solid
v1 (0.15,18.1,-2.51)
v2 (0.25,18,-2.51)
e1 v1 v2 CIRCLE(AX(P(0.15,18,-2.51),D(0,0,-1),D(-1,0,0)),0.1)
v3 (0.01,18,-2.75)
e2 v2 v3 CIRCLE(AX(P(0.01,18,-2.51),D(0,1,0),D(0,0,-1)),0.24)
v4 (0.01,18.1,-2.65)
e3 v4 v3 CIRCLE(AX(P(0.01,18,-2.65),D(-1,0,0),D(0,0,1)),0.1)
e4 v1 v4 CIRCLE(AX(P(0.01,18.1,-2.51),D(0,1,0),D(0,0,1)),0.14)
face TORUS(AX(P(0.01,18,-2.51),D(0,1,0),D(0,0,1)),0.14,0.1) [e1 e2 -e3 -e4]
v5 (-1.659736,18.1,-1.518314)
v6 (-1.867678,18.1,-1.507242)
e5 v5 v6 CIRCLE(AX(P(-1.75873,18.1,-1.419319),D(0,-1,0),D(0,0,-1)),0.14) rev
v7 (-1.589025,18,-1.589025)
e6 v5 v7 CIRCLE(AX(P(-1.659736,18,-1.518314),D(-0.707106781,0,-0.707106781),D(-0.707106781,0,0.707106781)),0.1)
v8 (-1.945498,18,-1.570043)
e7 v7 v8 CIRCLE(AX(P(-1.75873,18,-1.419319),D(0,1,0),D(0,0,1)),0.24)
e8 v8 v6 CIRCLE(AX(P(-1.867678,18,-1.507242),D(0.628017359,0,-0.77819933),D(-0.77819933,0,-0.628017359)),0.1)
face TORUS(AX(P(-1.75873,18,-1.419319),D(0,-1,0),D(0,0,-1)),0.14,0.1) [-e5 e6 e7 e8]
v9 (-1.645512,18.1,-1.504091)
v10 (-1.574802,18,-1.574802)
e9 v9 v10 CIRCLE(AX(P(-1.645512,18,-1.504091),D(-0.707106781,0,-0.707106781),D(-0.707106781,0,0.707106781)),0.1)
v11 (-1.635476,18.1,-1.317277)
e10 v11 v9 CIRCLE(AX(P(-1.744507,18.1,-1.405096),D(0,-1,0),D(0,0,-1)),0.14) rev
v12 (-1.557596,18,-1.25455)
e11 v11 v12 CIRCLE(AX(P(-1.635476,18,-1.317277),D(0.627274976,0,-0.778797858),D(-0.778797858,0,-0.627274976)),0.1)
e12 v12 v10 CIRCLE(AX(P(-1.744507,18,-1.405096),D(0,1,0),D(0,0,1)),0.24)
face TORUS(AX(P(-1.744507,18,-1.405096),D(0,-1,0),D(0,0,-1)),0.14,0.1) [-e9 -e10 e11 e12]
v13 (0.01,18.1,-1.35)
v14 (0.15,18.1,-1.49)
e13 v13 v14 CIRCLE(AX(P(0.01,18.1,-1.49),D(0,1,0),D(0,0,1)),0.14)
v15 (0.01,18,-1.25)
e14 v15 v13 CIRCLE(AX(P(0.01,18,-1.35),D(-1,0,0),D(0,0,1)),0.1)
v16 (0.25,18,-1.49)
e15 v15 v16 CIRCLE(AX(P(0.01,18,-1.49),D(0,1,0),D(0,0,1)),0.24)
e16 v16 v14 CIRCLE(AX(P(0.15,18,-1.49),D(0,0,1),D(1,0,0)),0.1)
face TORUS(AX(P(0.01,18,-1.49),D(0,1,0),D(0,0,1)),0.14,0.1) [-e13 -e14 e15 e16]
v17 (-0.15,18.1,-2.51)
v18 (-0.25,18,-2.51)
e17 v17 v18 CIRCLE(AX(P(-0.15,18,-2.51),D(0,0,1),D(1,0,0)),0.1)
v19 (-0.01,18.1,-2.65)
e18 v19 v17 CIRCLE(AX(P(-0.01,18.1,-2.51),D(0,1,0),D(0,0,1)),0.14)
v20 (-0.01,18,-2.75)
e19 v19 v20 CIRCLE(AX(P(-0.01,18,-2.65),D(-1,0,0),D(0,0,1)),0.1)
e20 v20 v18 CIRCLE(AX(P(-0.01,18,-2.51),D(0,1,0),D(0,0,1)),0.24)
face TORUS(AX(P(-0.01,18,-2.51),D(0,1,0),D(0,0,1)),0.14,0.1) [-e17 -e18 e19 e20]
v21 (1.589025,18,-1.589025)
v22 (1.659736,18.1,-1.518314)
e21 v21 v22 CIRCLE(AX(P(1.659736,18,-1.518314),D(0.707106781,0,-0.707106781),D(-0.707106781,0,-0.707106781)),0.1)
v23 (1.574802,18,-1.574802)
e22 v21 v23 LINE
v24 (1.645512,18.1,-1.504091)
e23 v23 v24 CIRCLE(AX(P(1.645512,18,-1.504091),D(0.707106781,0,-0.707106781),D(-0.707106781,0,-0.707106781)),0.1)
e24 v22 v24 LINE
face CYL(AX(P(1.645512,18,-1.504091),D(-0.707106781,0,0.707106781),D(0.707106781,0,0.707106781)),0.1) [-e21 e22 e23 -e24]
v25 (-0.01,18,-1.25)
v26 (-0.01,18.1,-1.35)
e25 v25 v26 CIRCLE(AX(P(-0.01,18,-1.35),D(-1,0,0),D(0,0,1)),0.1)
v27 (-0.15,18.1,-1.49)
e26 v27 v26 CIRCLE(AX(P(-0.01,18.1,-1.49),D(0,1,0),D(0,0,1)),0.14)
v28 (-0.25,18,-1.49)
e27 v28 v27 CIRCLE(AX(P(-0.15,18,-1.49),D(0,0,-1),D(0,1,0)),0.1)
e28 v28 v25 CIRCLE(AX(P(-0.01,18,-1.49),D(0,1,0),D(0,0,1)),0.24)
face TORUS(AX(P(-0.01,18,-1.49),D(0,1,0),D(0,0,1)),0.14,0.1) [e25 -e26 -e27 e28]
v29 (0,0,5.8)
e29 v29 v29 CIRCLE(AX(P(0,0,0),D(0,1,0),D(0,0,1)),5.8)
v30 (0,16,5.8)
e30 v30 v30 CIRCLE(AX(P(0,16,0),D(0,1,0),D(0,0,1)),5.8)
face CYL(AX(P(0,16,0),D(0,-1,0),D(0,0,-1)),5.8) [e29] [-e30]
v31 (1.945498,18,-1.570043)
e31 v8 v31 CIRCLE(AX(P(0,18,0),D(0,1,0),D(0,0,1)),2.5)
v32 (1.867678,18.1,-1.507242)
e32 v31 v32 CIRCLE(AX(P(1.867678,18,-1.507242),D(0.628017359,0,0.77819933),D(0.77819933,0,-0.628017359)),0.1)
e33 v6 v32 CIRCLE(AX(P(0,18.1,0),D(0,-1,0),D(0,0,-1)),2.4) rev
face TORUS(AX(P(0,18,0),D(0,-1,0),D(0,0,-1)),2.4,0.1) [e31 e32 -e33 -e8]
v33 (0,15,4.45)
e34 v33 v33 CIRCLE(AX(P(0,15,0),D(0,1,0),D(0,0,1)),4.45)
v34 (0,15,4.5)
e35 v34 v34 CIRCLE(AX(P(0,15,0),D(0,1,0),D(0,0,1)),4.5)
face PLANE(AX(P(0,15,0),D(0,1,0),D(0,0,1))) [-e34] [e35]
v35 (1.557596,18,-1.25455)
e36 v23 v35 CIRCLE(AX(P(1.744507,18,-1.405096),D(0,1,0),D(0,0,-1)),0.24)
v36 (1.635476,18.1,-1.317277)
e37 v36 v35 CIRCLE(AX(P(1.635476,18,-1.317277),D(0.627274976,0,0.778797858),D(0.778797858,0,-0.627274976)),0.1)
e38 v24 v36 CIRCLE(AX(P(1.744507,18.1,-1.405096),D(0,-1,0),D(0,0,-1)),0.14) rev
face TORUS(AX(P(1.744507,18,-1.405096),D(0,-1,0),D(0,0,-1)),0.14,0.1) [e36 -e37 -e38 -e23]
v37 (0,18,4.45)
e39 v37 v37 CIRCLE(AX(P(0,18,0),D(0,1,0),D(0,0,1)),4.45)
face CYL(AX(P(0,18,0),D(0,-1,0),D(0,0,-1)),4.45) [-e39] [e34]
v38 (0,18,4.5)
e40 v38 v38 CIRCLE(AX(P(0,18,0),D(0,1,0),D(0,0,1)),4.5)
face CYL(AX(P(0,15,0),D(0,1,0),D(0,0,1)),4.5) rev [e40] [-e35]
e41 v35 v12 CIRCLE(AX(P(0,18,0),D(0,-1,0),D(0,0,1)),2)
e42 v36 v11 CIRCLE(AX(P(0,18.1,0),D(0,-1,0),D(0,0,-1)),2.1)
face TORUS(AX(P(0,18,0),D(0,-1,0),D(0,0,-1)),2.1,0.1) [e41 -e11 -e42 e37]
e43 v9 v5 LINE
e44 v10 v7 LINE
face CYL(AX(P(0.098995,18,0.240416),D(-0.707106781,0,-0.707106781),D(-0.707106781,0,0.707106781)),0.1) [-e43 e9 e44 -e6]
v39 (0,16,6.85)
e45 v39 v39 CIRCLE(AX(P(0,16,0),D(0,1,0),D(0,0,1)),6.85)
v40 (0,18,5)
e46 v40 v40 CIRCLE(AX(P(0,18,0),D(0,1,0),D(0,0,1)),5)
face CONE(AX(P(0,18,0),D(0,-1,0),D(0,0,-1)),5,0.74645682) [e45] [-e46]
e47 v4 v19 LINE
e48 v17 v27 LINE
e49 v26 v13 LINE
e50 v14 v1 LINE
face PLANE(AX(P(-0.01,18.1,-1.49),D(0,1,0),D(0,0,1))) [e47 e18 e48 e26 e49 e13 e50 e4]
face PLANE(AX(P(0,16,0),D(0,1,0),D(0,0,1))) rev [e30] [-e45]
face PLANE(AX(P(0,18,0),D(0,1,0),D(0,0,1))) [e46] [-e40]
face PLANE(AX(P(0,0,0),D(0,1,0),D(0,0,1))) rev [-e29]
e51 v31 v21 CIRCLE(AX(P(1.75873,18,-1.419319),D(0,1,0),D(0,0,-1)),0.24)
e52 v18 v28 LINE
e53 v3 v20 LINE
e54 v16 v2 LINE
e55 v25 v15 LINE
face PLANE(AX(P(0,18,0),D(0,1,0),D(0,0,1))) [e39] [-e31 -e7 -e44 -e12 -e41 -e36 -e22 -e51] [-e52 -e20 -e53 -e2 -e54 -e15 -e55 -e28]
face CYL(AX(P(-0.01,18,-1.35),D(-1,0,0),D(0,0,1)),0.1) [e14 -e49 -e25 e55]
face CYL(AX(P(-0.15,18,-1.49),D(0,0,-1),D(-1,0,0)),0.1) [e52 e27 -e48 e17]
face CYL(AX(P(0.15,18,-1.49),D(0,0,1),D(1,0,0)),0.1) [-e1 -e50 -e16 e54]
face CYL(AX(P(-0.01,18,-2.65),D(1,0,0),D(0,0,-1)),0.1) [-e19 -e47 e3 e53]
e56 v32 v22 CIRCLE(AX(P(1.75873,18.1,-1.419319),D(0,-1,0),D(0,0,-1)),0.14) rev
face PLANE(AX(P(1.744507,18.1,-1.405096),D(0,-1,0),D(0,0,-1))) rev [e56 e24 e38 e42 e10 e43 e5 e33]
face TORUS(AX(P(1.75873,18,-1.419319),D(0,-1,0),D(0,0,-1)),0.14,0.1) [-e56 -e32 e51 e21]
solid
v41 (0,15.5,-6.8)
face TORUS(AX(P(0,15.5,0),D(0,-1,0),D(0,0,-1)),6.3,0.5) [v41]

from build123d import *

# Parameters (mm, degrees)
SKETCH1_R           = 5.8
BOSS_EXTRUDE1_DEPTH = 16
SKETCH3_R           = 5
SKETCH2_R           = 6.85
SKETCH4_R           = 4.5
CUT_EXTRUDE1_DEPTH  = 3
SKETCH6_R           = 4.45
BOSS_EXTRUDE2_DEPTH = 3
BOSS_EXTRUDE3_DEPTH = 0.1
FILLET1_R           = 0.1
SKETCH8_R           = 0.5


with BuildPart() as part:
    # Sketch1 → Boss-Extrude1 (new body)
    with BuildSketch(Plane(origin=(0, 0, 0), x_dir=(1, 0, 0), z_dir=(0, 1, 0))):
        with Locations(Location((0, 0, 0), (0, 0, 270))):
            Circle(SKETCH1_R)
    extrude(amount=BOSS_EXTRUDE1_DEPTH)

    # Sketch3 → Loft1 section 0
    with BuildSketch(Plane(origin=(0, 18, 0), x_dir=(1, 0, 0), z_dir=(0, 1, 0))):
        Circle(SKETCH3_R)
    # Sketch2 → Loft1 section 1
    with BuildSketch(Plane(origin=(0, 16, 0), x_dir=(1, 0, 0), z_dir=(0, 1, 0))):
        Circle(SKETCH2_R)
    loft()

    # Sketch4 → Cut-Extrude1 (cut)
    with BuildSketch(Plane(origin=(0, 18, 0), x_dir=(1, 0, 0), z_dir=(0, 1, 0))):
        with Locations(Location((0, 0, 0), (0, 0, 270))):
            Circle(SKETCH4_R)
    extrude(amount=-CUT_EXTRUDE1_DEPTH, mode=Mode.SUBTRACT)

    # Sketch6 → Boss-Extrude2 (add)
    with BuildSketch(Plane(origin=(0, 15, 0), x_dir=(1, 0, 0), z_dir=(0, 1, 0))):
        with Locations(Location((0, 0, 0), (0, 0, 270))):
            Circle(SKETCH6_R)
    extrude(amount=BOSS_EXTRUDE2_DEPTH)

    # Sketch7 → Boss-Extrude3 (add)
    with BuildSketch(Plane(origin=(0, 18, 0), x_dir=(1, 0, 0), z_dir=(0, 1, 0))):
        with BuildLine():
            Line((-1.589024858, 1.589024858), (-1.574801575, 1.574801575))
            ThreePointArc((-1.574801575, 1.574801575), (-1.504852833, 1.417971633), (-1.557595716, 1.254549953))
            ThreePointArc((-1.557595716, 1.254549953), (0, -2), (1.557595716, 1.254549953))
            ThreePointArc((1.557595716, 1.254549953), (1.504852833, 1.417971633), (1.574801575, 1.574801575))
            Line((1.574801575, 1.574801575), (1.589024858, 1.589024858))
            ThreePointArc((1.589024858, 1.589024858), (1.771491902, 1.658979712), (1.945498325, 1.570043397))
            ThreePointArc((1.945498325, 1.570043397), (0, -2.5), (-1.945498325, 1.570043397))
            ThreePointArc((-1.945498325, 1.570043397), (-1.771491902, 1.658979712), (-1.589024858, 1.589024858))
        make_face()
        with BuildLine():
            Line((-0.01, 2.75), (0.01, 2.75))
            ThreePointArc((0.01, 2.75), (0.179705627, 2.679705627), (0.25, 2.51))
            Line((0.25, 2.51), (0.25, 1.49))
            ThreePointArc((0.25, 1.49), (0.179705627, 1.320294373), (0.01, 1.25))
            Line((0.01, 1.25), (-0.01, 1.25))
            ThreePointArc((-0.01, 1.25), (-0.179705627, 1.320294373), (-0.25, 1.49))
            Line((-0.25, 1.49), (-0.25, 2.51))
            ThreePointArc((-0.25, 2.51), (-0.179705627, 2.679705627), (-0.01, 2.75))
        make_face()
    extrude(amount=BOSS_EXTRUDE3_DEPTH)

    # Fillet1
    fillet1_edges = [part.edges().sort_by_distance(p)[0] for p in [
        (-1.771491902, 18.1, -1.658979712),
        (-1.581913217, 18.1, -1.581913217),
        (-1.504852833, 18.1, -1.417971633),
        (0, 18.1, 2),
        (1.504852833, 18.1, -1.417971633),
        (1.581913217, 18.1, -1.581913217),
        (1.771491902, 18.1, -1.658979712),
        (-0.25, 18.1, -2),
        (-0.179705627, 18.1, -2.679705627),
        (0, 18.1, -2.75),
        (0.179705627, 18.1, -2.679705627),
        (0.25, 18.1, -2),
        (0.179705627, 18.1, -1.320294373),
        (0, 18.1, -1.25),
        (-0.179705627, 18.1, -1.320294373),
        (0, 18.1, 2.5),
    ]]
    fillet(fillet1_edges, radius=FILLET1_R - 0.0001)  # a hair under: the kernel refuses the full size


with BuildPart() as body_2:
    # Sketch8 → Revolve1 (revolve)
    with BuildSketch(Plane.XY, mode=Mode.PRIVATE) as revolve1_sk:
        with Locations((-6.3, 15.5)):
            Circle(SKETCH8_R)
    revolve(revolve1_sk.sketch.rotate(Axis((0, 16, 0), (0, 1, 0)), 90), axis=Axis((0, 16, 0), (0, 1, 0)))


solid = Compound([part.part, body_2.part])
